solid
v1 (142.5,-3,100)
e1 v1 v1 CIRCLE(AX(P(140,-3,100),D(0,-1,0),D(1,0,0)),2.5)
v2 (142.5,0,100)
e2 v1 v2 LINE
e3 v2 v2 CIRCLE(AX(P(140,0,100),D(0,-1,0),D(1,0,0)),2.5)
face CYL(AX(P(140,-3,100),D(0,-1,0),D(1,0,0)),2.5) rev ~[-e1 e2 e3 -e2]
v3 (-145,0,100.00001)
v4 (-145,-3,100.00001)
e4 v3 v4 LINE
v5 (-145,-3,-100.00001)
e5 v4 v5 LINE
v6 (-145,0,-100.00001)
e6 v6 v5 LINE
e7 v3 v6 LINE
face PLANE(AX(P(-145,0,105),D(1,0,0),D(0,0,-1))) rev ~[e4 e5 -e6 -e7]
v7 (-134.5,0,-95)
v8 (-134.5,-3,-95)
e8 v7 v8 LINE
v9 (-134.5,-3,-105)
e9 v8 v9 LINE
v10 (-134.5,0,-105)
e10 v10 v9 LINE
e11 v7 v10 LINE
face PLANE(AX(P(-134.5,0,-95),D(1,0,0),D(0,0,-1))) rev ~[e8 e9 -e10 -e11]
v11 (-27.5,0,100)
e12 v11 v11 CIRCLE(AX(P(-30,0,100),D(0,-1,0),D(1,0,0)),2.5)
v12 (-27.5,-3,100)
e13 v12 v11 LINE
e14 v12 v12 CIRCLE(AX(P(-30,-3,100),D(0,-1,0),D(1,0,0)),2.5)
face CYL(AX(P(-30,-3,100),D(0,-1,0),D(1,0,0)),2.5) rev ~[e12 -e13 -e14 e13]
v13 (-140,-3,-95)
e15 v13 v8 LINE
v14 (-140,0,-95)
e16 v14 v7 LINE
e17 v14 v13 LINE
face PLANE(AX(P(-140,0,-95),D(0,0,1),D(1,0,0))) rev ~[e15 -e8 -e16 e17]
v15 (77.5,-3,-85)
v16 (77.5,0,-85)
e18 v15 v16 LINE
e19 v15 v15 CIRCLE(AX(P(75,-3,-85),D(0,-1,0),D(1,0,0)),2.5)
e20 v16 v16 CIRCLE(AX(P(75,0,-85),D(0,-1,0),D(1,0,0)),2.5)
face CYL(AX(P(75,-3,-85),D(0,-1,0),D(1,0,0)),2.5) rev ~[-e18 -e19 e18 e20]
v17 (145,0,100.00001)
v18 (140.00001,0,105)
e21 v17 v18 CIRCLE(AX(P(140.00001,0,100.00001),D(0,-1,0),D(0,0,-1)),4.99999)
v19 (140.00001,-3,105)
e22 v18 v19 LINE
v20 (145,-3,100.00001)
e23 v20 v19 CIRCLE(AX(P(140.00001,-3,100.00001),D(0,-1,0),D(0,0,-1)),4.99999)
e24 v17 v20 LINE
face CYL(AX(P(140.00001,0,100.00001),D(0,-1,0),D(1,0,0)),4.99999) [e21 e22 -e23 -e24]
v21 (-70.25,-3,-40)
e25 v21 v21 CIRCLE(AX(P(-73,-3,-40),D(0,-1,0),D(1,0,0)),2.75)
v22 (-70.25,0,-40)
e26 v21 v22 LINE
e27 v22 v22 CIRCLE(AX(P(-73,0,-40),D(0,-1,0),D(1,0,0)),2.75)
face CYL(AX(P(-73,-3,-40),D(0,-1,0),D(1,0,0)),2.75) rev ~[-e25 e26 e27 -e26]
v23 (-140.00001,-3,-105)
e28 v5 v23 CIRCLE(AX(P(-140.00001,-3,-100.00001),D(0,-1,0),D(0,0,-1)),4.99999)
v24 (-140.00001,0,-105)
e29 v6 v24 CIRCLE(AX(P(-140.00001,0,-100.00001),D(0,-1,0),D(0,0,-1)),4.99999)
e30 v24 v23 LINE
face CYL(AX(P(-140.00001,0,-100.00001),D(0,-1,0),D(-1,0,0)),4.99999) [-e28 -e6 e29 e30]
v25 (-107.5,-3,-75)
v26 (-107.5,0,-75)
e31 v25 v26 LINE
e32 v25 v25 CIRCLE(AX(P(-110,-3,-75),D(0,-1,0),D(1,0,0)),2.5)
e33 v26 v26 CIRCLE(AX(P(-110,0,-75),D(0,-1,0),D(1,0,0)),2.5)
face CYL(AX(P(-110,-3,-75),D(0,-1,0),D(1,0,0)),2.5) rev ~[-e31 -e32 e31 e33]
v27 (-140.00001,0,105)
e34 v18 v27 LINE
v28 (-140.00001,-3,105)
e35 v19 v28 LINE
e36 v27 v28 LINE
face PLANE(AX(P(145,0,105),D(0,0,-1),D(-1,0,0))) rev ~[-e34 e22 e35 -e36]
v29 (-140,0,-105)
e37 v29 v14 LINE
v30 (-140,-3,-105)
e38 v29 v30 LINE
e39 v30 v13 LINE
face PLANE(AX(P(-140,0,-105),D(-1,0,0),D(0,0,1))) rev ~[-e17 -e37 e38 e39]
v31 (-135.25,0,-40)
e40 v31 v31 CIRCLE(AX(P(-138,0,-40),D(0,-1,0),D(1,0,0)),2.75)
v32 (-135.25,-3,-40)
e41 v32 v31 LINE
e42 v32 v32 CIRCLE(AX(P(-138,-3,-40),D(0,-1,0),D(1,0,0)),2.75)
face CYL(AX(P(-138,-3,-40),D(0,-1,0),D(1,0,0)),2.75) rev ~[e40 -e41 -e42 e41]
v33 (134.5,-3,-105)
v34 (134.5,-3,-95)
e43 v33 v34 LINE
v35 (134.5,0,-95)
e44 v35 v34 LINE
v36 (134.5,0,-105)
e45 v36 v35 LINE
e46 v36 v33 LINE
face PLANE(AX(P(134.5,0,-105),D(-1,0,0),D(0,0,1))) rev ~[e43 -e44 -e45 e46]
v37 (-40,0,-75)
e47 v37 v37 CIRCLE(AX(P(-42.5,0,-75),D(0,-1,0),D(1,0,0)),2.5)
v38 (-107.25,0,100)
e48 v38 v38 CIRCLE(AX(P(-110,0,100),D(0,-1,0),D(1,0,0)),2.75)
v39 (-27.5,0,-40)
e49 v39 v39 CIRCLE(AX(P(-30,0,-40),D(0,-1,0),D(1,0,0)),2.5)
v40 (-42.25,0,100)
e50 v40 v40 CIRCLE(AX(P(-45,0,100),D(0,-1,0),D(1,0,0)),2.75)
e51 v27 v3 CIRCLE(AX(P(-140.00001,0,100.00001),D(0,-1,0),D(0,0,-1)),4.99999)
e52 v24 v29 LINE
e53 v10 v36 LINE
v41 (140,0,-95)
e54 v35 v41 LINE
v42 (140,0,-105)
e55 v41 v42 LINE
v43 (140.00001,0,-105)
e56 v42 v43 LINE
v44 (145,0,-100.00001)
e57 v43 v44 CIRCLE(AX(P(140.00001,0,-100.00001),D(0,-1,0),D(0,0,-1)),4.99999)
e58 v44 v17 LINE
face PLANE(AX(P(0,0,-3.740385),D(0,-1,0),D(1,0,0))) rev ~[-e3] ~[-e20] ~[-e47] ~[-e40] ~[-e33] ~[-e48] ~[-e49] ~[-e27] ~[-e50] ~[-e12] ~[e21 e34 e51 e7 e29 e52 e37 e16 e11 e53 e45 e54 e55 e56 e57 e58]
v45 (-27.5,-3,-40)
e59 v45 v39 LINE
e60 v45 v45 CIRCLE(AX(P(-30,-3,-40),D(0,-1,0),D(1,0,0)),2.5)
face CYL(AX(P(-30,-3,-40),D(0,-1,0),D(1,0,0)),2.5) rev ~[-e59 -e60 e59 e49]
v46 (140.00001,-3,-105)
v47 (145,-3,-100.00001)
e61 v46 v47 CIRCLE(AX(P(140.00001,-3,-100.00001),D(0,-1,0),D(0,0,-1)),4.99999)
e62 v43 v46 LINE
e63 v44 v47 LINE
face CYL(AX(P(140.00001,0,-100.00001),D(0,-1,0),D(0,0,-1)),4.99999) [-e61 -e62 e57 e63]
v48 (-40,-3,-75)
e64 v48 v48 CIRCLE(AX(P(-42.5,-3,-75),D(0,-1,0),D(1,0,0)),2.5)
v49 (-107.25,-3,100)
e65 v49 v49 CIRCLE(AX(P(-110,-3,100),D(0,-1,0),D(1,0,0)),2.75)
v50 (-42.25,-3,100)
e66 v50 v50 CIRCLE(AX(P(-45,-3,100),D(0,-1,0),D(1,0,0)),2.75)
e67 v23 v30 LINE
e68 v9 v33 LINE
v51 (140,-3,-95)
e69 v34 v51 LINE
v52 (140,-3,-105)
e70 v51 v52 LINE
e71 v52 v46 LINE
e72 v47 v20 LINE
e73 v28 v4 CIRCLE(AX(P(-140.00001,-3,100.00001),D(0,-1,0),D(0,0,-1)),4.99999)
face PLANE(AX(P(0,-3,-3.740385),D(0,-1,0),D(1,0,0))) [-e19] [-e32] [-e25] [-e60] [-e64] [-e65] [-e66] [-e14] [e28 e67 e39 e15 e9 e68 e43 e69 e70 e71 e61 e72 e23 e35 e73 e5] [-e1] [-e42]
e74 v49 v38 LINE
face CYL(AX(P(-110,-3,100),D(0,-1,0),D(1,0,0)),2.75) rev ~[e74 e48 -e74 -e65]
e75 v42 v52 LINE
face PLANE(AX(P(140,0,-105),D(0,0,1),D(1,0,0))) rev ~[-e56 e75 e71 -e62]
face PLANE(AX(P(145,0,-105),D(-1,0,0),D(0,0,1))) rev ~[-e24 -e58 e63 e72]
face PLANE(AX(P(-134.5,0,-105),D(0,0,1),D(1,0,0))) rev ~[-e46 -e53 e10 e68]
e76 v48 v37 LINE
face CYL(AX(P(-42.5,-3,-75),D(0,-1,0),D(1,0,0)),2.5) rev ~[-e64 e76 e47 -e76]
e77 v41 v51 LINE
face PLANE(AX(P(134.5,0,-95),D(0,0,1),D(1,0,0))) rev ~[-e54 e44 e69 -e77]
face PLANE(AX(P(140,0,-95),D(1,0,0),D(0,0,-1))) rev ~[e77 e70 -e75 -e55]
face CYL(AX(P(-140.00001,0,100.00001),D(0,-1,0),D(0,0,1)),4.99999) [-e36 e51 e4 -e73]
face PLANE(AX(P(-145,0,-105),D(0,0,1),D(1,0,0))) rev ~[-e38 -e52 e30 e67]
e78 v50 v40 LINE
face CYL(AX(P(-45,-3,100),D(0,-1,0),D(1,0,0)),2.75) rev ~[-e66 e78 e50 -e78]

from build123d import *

# Parameters (mm, degrees)
F1_DEPTH = 3
F2_R     = 2.75
F3_DEPTH = 3
F4_R     = 2.5
F5_DEPTH = 3
F6_R     = 2.5
F7_DEPTH = 3
F8_R     = 4.99999


# Not quite as in the source:
# - a fillet or chamfer is up to 0.001 mm smaller than in the source, because OpenCascade refuses the exact size


with BuildPart() as f1:
    # F0 (on Front) → F1 (new body)
    with BuildSketch(Plane.XZ):
        Polygon((140, -105), (145, -105), (145, 105), (-145, 105), (-145, -105), (-140, -105), (-140, -95), (-134.5, -95), (-134.5, -105), (134.5, -105), (134.5, -95), (140, -95), align=None)
    extrude(amount=F1_DEPTH)

    # F2 (on face) → F3 (cut, through all)
    with BuildSketch(Plane.XZ.offset(3)):
        with Locations((-110, 100)):
            Circle(F2_R)
        with Locations((-138, -40)):
            Circle(F2_R)
        with Locations((-45, 100)):
            Circle(F2_R)
        with Locations((-73, -40)):
            Circle(F2_R)
    extrude(amount=-F3_DEPTH, mode=Mode.SUBTRACT)

    # F4 (on face) → F5 (cut, through all)
    with BuildSketch(Plane.XZ.offset(3)):
        with Locations((-30, 100)):
            Circle(F4_R)
        with Locations((140, 100)):
            Circle(F4_R)
        with Locations((75, -85)):
            Circle(F4_R)
        with Locations((-30, -40)):
            Circle(F4_R)
    extrude(amount=-F5_DEPTH, mode=Mode.SUBTRACT)

    # F6 (on face) → F7 (cut, through all)
    with BuildSketch(Plane.XZ.offset(3)):
        with Locations((-110, -75)):
            Circle(F6_R)
        with Locations((-42.5, -75)):
            Circle(F6_R)
    extrude(amount=-F7_DEPTH, mode=Mode.SUBTRACT)

    # F8 (radius 5 in the source; OpenCascade refuses exactly that, so slightly less here)
    f8_edges = [f1.edges().sort_by_distance(p)[0] for p in [
        (-145, -1.5, 105),
        (145, -1.5, 105),
        (145, -1.5, -105),
        (-145, -1.5, -105),
    ]]
    fillet(f8_edges, radius=F8_R)


solid = f1.part
